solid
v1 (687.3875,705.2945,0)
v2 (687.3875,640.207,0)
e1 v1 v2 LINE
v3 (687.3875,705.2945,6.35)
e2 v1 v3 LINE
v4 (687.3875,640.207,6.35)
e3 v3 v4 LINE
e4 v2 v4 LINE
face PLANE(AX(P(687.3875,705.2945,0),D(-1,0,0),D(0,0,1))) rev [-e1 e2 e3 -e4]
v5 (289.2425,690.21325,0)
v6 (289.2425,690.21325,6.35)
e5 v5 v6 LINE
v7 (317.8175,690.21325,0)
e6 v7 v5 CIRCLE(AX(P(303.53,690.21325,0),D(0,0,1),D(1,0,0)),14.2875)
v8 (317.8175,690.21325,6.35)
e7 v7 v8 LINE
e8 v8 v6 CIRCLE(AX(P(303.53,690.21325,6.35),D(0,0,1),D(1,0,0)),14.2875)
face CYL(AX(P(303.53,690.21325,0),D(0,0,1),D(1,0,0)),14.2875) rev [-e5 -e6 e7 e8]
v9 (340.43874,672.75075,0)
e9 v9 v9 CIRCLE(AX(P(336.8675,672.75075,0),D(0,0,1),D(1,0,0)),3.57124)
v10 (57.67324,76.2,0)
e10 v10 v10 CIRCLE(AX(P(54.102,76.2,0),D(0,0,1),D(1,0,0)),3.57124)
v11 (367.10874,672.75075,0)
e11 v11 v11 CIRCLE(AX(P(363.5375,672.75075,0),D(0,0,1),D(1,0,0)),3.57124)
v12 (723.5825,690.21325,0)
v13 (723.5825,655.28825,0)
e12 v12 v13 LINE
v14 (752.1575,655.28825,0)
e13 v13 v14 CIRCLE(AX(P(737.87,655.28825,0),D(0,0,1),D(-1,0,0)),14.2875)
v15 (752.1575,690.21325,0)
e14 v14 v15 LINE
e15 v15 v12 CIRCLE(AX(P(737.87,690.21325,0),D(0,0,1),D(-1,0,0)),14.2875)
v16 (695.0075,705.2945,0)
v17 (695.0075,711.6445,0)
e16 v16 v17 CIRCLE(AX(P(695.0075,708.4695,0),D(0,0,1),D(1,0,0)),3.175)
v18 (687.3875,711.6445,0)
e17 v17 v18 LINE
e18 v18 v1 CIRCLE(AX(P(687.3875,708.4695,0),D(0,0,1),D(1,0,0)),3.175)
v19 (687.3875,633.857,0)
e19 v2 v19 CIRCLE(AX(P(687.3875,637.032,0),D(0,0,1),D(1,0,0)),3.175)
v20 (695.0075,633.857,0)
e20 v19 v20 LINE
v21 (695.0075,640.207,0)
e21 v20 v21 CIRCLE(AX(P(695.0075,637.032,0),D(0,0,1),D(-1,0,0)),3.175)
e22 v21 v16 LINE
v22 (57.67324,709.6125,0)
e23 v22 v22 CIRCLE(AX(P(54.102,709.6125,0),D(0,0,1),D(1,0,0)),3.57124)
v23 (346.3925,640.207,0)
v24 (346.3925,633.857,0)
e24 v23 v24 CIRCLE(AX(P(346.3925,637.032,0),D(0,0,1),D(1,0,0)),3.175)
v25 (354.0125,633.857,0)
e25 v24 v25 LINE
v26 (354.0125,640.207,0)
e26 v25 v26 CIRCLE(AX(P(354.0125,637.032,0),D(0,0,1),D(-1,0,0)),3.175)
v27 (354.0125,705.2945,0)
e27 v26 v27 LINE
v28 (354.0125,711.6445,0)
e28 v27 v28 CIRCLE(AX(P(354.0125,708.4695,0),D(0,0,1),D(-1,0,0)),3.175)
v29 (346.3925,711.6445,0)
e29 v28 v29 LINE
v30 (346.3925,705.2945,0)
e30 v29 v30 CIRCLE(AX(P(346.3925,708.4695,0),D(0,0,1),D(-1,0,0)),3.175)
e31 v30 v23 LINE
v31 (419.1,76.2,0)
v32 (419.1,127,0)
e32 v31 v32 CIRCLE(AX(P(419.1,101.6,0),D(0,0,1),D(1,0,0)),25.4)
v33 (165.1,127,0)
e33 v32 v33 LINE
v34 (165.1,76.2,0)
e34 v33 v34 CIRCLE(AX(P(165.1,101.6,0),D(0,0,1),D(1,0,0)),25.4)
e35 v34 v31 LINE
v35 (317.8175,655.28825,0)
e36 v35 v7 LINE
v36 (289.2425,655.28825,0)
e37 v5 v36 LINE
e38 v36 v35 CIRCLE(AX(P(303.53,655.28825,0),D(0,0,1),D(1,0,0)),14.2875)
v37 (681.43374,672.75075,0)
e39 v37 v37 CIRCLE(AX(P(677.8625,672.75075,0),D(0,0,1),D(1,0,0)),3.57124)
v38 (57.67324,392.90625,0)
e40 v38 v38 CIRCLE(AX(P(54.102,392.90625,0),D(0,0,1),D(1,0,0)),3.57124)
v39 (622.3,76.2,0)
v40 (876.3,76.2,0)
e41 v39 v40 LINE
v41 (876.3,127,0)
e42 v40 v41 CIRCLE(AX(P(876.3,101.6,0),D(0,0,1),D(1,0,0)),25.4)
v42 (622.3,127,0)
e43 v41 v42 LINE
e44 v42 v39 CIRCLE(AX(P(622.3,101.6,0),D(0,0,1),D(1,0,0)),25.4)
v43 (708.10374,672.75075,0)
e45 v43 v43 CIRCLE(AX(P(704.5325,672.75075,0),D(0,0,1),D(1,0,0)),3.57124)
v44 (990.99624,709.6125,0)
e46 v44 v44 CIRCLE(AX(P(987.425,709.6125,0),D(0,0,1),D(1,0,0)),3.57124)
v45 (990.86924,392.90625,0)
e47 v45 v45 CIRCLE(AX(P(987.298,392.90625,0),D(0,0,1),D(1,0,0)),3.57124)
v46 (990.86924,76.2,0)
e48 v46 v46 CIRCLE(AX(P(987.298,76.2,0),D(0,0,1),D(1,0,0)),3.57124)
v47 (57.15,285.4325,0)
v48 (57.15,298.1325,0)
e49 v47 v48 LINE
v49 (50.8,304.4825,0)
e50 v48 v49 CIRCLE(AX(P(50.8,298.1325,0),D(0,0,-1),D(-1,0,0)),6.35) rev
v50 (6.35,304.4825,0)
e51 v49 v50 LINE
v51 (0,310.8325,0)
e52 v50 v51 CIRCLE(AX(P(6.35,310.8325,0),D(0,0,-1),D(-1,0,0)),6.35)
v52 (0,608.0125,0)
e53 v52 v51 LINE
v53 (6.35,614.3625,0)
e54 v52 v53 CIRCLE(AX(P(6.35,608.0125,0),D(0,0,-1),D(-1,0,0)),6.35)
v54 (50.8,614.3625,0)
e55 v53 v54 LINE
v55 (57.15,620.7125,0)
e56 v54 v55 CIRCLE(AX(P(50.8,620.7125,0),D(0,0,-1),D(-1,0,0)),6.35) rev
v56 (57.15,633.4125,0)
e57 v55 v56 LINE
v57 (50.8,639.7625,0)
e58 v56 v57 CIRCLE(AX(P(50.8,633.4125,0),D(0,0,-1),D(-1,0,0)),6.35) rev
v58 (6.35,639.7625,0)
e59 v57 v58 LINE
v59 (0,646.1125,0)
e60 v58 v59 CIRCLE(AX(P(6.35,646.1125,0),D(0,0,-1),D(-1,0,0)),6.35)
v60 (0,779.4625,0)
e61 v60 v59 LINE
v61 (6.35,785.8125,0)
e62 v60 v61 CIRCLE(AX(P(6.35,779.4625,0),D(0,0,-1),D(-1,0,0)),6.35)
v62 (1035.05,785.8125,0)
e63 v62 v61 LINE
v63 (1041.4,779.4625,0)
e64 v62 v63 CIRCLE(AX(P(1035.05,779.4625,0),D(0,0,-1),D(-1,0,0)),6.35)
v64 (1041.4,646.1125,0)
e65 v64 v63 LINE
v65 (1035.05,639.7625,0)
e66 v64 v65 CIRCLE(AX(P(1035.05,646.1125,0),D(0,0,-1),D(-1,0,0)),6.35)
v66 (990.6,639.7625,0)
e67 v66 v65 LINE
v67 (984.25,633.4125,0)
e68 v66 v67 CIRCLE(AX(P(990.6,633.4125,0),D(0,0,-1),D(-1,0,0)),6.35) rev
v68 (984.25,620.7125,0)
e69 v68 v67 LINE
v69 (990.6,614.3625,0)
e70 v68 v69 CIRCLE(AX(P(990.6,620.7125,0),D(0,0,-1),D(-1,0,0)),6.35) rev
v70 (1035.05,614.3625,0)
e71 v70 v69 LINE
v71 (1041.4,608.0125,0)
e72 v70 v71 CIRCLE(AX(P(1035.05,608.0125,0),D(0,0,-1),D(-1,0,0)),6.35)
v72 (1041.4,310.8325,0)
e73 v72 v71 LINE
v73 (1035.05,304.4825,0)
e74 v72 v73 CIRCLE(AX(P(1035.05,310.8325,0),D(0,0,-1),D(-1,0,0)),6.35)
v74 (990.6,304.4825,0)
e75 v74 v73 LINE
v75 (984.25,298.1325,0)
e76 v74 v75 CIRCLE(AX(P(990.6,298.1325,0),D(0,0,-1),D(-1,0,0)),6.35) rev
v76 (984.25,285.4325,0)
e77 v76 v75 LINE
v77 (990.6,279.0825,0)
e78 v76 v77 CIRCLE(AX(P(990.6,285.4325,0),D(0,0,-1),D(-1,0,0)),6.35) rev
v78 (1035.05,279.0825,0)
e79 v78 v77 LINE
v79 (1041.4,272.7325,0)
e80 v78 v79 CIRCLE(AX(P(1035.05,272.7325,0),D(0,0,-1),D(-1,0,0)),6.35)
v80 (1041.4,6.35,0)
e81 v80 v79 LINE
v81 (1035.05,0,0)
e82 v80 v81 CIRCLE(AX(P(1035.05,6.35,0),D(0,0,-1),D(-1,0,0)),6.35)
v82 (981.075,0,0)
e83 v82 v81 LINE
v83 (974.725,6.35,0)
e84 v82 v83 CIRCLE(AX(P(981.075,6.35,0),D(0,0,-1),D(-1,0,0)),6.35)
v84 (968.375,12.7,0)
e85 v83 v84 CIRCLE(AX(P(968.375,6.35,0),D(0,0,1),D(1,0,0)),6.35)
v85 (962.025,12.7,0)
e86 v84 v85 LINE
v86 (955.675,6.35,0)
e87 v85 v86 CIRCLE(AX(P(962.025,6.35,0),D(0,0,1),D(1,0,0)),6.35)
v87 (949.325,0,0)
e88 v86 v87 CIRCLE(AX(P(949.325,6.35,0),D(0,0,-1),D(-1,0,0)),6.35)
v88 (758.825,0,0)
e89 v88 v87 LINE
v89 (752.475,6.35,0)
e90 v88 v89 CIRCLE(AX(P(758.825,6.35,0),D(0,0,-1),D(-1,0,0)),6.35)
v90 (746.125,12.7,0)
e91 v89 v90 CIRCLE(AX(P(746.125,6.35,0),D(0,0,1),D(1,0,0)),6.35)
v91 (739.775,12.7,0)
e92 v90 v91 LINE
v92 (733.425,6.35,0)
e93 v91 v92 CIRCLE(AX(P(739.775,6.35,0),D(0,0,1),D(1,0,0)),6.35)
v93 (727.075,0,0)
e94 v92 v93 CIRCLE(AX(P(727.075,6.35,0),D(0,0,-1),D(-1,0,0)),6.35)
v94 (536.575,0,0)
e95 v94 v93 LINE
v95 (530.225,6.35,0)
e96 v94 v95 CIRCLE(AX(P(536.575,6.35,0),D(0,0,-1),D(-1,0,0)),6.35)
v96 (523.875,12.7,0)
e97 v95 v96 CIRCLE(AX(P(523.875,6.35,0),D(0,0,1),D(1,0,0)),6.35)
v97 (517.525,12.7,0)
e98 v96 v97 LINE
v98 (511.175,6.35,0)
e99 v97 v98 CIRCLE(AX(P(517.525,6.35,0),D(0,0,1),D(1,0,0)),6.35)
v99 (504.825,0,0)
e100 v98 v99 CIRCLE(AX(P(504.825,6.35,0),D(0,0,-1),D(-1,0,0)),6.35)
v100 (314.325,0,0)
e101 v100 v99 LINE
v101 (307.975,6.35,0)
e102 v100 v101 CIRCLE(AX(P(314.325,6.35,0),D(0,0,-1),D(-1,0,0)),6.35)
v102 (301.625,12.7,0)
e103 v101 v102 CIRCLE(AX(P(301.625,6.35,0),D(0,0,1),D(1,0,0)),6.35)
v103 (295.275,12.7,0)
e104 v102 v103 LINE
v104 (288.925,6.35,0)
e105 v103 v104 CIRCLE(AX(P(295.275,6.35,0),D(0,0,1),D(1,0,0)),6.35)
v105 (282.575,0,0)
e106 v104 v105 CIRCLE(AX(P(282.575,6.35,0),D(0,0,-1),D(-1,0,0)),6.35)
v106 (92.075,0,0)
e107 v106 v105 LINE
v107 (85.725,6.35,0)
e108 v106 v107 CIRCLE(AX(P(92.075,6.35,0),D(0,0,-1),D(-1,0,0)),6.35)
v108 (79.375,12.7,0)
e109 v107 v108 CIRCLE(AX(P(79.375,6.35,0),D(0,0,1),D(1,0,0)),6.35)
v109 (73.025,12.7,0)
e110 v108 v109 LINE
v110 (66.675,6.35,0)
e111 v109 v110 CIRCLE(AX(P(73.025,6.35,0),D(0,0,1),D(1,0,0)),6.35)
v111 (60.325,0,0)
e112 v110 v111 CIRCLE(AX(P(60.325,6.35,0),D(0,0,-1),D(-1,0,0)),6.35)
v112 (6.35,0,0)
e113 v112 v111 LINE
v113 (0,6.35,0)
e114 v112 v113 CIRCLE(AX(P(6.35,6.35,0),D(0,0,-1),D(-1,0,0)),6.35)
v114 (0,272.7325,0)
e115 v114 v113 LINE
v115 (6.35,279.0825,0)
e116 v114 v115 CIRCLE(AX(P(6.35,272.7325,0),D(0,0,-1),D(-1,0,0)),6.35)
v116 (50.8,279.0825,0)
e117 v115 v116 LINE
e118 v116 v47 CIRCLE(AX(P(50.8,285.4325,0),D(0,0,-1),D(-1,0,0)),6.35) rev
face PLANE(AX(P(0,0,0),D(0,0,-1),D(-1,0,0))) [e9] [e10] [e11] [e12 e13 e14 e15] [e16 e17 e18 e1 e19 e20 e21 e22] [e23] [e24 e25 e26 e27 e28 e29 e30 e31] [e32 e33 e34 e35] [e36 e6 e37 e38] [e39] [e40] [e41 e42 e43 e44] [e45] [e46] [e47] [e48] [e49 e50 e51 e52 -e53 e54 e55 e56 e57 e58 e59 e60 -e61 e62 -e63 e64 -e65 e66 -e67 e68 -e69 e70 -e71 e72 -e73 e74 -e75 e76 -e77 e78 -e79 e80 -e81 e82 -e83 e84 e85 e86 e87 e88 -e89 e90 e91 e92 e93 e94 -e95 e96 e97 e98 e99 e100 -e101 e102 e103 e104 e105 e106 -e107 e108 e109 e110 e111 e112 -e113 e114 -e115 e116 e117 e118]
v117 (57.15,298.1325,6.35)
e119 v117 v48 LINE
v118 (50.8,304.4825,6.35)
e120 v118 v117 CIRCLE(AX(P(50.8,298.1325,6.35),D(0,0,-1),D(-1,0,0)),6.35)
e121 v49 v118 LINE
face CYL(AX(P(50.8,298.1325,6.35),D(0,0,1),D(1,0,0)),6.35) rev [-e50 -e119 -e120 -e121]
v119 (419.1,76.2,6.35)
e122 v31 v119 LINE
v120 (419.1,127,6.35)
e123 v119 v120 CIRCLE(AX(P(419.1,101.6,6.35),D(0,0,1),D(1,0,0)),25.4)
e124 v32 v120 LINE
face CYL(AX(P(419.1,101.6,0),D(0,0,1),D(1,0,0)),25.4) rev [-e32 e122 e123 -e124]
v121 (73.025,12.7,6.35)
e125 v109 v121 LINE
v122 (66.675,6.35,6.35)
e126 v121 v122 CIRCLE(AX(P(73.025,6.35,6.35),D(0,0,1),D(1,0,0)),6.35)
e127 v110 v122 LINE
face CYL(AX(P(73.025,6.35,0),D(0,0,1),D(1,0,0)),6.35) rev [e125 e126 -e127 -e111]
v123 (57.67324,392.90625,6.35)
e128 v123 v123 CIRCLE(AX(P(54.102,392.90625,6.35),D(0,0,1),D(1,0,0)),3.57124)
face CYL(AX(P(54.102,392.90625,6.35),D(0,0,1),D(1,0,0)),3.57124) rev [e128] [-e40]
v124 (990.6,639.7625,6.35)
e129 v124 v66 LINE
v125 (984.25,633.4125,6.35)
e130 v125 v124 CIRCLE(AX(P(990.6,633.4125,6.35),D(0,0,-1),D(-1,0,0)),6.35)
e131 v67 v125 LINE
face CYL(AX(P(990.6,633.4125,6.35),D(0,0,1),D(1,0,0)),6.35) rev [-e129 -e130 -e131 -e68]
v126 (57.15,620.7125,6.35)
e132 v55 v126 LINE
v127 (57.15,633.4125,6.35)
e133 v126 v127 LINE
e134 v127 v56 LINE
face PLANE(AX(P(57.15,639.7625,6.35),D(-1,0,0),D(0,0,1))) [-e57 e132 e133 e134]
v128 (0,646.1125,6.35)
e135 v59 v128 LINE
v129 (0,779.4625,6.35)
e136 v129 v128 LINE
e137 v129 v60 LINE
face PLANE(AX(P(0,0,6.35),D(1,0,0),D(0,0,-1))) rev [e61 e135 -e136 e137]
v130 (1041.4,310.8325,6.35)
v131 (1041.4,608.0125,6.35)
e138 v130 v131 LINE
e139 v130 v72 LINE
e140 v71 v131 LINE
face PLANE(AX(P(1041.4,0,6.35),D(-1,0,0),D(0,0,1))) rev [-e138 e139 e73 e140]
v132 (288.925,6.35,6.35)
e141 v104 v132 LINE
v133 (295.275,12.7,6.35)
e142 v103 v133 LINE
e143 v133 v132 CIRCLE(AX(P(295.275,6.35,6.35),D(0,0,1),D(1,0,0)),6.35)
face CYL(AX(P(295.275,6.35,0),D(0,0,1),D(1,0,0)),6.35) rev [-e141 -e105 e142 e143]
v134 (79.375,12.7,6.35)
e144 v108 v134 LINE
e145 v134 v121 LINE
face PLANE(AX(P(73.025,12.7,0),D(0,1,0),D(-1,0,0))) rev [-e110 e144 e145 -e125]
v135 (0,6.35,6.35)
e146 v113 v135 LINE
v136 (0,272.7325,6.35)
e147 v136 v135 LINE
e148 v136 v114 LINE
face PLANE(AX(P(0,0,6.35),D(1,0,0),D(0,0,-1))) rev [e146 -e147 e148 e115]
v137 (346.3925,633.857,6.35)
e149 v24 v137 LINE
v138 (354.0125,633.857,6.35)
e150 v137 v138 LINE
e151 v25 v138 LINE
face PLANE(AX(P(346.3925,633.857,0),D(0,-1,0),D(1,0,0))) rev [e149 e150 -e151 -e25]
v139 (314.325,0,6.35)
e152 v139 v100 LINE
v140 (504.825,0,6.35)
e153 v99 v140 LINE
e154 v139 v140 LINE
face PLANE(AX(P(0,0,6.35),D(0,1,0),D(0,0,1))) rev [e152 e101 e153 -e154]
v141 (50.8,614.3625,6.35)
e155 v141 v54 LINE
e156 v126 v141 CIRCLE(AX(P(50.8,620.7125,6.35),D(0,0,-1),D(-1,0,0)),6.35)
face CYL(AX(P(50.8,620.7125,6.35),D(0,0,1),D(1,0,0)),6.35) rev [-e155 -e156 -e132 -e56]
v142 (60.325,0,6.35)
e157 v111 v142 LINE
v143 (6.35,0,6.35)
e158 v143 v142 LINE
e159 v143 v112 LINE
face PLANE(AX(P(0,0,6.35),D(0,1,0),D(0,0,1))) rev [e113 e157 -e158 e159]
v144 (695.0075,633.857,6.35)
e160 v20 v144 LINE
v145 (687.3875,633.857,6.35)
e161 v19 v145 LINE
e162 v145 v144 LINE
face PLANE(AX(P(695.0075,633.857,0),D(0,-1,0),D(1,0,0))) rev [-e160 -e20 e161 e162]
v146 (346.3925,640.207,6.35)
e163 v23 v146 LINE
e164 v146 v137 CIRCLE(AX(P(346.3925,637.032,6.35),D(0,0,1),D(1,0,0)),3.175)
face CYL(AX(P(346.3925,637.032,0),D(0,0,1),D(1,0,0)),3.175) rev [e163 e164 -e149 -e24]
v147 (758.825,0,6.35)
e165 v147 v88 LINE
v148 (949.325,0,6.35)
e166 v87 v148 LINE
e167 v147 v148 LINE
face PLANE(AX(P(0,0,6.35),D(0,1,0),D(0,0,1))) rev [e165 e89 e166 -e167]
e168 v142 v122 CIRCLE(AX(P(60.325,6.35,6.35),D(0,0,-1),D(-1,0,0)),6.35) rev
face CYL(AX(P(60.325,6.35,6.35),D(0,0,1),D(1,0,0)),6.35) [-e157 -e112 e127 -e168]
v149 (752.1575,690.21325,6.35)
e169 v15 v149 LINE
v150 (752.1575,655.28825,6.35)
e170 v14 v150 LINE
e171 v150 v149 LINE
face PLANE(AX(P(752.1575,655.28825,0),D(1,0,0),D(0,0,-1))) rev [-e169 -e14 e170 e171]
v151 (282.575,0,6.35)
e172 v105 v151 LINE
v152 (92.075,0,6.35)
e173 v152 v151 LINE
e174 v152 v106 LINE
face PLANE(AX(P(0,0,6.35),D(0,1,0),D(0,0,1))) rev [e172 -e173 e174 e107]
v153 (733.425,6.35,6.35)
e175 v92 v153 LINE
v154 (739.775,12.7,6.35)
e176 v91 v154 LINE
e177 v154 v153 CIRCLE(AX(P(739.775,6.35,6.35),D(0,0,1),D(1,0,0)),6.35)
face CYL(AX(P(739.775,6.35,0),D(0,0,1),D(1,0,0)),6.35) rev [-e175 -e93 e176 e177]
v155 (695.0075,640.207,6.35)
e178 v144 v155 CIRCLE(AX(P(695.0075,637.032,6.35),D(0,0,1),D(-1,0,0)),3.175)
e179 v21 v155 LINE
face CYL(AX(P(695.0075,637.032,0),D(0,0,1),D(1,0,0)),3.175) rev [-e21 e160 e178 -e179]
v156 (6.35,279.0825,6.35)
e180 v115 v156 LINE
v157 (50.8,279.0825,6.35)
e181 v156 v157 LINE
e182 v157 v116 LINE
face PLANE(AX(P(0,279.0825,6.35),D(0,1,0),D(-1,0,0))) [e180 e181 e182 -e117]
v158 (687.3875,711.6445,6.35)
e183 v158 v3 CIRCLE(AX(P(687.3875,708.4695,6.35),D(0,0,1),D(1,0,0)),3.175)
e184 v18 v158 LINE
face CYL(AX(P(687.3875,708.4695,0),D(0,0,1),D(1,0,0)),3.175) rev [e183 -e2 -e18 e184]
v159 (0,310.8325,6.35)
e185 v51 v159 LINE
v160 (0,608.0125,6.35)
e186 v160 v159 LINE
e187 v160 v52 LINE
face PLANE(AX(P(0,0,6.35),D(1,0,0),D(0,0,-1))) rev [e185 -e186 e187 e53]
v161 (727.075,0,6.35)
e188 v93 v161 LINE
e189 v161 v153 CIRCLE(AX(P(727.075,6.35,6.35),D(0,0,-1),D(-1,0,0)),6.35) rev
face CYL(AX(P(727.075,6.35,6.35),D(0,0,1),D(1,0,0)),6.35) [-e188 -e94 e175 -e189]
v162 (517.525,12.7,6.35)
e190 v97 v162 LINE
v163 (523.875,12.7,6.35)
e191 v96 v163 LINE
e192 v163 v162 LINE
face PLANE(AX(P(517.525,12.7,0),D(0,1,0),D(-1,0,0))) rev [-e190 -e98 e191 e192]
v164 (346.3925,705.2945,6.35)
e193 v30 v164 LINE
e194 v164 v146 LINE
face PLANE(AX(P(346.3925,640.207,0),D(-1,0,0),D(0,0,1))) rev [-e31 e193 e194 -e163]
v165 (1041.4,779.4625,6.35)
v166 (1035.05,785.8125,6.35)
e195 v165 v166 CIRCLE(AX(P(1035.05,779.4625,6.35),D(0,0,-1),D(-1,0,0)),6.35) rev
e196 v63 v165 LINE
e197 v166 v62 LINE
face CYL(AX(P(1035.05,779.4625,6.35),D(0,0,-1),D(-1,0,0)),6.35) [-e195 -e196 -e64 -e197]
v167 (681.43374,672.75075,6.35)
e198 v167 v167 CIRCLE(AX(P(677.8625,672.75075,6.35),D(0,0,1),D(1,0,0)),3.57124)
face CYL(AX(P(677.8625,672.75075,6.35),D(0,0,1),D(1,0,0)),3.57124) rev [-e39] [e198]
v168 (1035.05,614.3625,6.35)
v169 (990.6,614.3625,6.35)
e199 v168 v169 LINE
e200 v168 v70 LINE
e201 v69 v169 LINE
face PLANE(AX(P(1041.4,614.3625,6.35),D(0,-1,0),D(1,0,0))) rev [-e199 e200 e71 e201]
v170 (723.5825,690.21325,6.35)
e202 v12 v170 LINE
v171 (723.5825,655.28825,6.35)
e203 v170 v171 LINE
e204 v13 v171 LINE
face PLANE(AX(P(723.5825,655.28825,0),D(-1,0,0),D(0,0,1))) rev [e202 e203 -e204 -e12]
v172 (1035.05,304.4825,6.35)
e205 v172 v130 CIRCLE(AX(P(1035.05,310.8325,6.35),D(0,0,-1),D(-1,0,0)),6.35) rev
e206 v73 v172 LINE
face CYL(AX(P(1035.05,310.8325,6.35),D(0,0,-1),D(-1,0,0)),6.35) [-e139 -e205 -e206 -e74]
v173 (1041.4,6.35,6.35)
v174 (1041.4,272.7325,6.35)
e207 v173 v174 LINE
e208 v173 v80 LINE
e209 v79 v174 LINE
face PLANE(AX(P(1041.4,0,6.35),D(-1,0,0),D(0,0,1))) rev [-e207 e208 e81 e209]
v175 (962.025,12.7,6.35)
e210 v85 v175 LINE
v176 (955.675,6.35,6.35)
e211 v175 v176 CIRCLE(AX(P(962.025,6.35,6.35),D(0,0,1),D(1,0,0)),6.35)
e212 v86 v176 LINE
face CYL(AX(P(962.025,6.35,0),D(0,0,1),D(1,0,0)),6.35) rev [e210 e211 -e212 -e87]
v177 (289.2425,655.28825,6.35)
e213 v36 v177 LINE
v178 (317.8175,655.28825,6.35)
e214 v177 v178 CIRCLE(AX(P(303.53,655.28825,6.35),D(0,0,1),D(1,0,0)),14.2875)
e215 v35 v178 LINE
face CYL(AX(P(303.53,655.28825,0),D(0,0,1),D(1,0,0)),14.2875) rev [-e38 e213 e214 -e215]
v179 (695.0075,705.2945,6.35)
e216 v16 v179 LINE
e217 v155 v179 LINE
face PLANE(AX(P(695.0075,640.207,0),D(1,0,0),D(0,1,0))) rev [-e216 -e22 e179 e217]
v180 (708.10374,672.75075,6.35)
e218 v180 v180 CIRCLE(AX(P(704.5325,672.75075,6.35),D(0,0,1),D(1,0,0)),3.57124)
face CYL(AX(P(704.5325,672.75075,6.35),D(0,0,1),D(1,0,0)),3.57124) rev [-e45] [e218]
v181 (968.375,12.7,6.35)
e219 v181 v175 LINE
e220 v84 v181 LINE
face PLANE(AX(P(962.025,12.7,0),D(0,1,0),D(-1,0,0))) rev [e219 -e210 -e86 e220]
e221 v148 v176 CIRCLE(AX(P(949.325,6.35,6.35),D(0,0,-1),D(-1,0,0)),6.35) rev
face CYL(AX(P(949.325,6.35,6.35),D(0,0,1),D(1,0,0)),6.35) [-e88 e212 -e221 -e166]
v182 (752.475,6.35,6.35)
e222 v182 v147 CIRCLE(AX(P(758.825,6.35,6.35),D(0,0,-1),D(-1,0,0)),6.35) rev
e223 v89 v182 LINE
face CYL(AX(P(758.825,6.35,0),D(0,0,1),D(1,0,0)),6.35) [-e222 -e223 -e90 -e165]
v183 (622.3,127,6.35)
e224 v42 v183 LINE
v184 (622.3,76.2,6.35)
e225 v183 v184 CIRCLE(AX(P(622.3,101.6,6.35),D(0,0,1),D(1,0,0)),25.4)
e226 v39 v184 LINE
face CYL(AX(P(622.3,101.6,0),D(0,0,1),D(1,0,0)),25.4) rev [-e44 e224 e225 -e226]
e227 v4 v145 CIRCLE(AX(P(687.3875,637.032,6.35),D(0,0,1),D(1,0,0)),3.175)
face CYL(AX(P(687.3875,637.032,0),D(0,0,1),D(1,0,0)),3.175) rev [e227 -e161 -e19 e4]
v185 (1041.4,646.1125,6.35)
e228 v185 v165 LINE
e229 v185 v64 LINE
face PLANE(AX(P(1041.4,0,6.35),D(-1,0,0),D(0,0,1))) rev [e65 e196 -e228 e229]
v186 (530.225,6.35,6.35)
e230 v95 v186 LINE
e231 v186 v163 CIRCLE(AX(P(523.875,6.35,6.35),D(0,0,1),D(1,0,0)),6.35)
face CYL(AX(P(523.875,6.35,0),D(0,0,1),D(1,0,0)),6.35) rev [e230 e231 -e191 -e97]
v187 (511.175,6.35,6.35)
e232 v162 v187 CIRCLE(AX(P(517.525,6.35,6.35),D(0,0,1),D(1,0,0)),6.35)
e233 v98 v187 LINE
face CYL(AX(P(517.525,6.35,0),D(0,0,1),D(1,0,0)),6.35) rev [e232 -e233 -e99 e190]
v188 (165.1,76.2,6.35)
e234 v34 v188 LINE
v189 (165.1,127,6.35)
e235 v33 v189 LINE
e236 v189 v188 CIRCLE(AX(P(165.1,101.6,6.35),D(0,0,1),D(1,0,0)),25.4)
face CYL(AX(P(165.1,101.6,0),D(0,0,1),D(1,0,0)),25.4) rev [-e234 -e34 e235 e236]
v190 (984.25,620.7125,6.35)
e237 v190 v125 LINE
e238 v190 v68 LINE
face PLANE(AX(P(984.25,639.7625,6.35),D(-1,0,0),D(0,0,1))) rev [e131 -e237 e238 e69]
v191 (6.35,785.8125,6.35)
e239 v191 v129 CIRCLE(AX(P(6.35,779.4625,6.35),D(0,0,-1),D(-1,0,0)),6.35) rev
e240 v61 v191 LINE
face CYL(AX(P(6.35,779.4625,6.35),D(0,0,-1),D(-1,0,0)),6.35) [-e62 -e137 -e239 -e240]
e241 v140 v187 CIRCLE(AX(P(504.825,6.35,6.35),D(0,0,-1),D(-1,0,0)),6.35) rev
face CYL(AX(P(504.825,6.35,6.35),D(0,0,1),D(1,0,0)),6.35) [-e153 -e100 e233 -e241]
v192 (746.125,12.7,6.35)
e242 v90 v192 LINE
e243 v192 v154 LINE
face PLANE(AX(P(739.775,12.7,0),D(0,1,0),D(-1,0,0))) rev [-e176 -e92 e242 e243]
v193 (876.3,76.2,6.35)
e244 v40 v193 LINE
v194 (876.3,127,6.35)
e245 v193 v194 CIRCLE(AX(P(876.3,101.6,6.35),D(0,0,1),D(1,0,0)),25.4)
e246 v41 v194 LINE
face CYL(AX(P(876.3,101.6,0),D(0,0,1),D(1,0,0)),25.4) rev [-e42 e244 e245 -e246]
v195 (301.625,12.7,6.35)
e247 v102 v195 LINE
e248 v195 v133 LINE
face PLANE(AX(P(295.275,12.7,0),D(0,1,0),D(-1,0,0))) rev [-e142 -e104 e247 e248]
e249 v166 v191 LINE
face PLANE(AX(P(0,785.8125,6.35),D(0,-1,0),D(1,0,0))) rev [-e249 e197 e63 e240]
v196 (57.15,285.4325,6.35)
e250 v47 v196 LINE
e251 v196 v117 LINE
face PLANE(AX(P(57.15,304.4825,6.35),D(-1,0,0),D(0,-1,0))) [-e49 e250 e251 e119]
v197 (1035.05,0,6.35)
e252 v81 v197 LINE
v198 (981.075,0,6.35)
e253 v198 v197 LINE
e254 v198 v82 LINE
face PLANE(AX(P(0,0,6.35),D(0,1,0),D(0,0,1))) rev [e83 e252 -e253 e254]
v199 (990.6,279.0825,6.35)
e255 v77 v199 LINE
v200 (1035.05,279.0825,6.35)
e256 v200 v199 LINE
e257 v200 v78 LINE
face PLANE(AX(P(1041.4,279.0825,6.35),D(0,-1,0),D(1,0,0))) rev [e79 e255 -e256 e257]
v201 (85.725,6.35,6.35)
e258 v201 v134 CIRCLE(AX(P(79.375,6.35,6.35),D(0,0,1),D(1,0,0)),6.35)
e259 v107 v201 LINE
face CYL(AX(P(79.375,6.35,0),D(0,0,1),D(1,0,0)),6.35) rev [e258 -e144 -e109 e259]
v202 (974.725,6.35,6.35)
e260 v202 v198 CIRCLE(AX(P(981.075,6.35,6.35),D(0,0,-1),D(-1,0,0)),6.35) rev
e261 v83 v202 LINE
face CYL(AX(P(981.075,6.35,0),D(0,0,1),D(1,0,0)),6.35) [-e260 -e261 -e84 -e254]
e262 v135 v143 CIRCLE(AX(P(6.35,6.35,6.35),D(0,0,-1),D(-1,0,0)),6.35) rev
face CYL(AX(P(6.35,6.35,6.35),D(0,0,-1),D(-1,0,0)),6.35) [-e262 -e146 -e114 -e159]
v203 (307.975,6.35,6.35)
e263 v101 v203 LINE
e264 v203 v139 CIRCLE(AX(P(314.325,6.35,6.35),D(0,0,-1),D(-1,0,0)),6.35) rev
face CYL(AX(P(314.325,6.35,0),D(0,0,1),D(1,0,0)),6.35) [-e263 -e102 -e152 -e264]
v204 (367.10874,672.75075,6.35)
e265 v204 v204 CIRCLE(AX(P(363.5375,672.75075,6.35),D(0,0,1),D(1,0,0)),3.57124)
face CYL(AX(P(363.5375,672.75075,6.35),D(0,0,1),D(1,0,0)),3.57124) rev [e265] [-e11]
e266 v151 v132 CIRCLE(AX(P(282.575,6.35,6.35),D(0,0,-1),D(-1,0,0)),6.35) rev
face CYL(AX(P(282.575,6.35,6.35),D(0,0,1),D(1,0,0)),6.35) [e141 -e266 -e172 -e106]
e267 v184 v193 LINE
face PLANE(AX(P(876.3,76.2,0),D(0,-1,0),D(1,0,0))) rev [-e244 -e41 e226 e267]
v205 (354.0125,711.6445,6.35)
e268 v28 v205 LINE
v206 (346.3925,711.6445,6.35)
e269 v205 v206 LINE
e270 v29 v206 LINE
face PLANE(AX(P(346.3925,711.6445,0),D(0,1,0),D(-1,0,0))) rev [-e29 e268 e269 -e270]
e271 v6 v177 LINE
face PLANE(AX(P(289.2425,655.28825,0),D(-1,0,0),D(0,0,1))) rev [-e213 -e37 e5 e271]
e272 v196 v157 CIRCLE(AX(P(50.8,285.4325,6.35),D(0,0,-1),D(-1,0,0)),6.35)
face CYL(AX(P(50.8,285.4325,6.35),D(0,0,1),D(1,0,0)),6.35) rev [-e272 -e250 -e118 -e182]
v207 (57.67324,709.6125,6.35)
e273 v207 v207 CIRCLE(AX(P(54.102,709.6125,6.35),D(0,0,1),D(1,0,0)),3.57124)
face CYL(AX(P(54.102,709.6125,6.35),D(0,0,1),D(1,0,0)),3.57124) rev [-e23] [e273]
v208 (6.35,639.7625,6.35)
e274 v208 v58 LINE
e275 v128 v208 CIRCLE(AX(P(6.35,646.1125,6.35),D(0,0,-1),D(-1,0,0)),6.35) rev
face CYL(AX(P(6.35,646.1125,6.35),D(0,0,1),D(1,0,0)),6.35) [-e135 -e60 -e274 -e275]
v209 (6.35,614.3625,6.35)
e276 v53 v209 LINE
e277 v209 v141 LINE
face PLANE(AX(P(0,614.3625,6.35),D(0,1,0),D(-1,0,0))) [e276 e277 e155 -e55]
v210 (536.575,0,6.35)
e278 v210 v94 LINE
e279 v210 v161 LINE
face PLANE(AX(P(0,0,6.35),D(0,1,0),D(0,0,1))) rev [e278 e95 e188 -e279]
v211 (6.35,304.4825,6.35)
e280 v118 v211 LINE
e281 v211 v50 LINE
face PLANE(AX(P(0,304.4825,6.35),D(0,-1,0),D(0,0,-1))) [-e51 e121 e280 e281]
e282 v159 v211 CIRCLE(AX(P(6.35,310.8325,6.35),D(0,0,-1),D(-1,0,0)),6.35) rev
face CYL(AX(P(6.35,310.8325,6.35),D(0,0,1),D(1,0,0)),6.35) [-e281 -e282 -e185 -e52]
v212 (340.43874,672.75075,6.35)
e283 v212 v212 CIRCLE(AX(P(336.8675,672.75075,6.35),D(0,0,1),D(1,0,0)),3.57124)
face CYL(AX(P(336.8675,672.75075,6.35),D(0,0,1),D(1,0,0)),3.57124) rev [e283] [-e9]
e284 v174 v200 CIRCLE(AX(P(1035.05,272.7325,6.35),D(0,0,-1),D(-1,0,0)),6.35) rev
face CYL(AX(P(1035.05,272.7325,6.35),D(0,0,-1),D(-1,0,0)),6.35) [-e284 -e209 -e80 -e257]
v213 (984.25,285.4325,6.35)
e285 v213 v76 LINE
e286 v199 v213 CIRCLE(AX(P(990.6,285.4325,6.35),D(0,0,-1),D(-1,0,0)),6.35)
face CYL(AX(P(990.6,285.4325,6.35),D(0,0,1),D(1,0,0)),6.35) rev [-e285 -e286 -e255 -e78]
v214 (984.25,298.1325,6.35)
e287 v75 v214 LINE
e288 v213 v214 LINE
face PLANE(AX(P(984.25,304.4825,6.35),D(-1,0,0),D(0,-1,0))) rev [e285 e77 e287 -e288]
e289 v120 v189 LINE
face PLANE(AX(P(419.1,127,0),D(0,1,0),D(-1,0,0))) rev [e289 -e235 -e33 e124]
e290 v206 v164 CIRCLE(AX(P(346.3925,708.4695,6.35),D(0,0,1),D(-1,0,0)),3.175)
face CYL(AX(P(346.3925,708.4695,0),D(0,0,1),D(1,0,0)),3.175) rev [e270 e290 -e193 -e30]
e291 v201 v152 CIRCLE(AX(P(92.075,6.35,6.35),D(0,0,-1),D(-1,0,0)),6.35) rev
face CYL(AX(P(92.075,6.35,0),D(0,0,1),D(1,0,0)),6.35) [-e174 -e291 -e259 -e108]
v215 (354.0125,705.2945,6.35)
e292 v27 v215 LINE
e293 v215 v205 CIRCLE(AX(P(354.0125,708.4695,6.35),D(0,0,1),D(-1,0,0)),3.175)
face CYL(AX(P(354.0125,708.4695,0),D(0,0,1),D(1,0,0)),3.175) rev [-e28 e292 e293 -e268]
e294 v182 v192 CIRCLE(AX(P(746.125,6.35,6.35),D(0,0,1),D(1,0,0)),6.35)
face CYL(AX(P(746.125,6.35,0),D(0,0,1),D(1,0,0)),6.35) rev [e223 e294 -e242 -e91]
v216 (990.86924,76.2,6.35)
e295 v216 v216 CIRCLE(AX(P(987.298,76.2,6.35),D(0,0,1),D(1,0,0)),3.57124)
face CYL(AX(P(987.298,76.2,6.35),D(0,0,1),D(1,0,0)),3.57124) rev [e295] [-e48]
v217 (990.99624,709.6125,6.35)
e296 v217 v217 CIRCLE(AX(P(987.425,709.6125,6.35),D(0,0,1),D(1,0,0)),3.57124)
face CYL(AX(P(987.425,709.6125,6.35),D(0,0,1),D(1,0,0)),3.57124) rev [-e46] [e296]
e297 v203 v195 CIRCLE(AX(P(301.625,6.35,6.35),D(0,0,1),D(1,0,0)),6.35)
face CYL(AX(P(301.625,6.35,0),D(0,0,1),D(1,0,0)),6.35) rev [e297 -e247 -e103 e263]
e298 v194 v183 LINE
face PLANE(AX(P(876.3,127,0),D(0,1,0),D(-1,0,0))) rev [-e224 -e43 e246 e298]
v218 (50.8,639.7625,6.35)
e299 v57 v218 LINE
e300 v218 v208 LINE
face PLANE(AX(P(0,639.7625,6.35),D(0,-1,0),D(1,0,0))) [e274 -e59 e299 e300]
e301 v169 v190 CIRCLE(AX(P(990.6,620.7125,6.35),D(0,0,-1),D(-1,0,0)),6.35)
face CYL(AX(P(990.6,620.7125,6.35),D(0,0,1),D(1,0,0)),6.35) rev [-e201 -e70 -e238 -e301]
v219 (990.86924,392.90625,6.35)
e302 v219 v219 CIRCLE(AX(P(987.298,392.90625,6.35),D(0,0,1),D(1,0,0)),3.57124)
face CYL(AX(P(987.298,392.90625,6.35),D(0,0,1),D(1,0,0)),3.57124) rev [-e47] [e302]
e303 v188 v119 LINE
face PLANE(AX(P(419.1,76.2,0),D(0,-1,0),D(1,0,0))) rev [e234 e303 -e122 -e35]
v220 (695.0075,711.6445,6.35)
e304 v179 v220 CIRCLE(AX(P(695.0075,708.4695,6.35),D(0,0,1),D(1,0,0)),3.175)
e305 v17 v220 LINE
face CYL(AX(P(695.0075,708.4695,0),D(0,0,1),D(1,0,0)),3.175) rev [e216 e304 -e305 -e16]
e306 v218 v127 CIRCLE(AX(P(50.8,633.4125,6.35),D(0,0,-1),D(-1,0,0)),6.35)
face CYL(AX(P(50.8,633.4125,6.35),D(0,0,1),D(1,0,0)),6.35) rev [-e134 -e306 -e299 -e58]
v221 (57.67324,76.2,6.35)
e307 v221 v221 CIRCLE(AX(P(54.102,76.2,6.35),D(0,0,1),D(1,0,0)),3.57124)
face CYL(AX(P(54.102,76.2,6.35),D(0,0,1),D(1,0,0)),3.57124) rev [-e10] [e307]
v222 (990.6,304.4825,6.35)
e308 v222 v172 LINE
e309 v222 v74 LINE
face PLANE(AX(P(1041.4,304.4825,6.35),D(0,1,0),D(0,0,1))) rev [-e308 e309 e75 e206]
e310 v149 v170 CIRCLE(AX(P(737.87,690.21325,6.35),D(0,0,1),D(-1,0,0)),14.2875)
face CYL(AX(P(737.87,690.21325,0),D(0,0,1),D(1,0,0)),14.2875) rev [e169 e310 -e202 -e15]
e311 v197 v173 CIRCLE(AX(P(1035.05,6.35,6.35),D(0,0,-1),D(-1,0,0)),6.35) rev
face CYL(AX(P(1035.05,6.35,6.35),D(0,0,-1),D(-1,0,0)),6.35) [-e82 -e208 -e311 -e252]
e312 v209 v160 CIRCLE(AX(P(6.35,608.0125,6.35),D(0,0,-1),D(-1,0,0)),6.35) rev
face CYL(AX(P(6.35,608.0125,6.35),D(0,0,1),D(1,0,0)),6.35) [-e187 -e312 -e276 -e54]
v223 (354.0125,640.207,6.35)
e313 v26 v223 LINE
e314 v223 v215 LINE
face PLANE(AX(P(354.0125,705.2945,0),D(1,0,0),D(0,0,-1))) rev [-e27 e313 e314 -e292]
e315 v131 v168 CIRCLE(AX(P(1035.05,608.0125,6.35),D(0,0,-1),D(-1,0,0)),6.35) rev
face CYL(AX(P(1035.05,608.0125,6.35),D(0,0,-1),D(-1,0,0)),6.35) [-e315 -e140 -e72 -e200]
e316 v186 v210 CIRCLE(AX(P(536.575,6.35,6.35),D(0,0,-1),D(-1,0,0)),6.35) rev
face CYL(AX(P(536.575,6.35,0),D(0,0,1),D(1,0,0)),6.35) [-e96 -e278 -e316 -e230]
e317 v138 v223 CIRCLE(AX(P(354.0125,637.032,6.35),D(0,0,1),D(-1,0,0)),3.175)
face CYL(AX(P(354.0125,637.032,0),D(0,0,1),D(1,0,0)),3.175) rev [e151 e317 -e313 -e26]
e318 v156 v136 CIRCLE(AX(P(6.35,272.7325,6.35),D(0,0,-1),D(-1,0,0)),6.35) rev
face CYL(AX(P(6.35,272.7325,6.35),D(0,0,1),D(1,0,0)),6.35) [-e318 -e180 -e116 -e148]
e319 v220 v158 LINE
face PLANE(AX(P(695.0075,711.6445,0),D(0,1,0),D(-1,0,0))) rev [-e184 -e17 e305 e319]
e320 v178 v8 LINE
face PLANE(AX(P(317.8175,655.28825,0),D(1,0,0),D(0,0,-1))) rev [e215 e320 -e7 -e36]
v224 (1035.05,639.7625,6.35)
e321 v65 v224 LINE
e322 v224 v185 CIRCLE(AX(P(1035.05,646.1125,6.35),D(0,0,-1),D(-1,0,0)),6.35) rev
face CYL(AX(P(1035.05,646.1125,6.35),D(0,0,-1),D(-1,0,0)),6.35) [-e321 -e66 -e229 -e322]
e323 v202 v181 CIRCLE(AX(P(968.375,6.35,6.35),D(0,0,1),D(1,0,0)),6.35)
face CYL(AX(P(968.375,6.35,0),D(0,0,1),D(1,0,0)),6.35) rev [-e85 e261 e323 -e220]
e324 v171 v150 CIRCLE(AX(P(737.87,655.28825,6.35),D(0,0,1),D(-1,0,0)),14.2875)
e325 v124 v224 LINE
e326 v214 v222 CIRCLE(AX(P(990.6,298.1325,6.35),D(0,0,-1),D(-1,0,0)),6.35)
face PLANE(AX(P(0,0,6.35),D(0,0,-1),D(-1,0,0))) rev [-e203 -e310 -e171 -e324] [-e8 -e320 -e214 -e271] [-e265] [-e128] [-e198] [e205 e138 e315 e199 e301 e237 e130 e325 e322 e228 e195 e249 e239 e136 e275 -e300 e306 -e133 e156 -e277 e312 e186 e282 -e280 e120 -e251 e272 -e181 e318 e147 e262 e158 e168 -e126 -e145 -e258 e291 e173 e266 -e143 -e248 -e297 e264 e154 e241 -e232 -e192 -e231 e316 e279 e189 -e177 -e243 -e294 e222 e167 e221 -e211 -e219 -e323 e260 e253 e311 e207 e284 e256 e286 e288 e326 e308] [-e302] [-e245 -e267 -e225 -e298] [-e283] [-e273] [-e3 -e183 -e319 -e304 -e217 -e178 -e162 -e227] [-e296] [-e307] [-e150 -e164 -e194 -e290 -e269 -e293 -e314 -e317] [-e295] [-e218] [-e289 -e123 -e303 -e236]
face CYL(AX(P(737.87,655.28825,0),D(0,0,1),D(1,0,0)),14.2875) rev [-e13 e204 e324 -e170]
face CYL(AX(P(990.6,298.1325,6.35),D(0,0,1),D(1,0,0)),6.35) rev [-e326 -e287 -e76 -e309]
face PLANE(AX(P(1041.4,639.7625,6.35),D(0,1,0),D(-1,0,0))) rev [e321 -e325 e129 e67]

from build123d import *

# Parameters (mm, degrees)
SKETCH1_W               = 1041.4
SKETCH1_H               = 785.8125
BOSS_EXTRUDE1_DEPTH     = 6.35
CUT_EXTRUDE5_DEPTH      = 1305.62851711
F_1_4_CLEARANCE_HOLE1_D = 7.14248
CUT_EXTRUDE6_DEPTH      = 1305.62851711
SKETCH13_W              = 57.15
SKETCH13_H              = 25.4
CUT_EXTRUDE7_DEPTH      = 1305.62851711
FILLET1_R               = 6.35
FILLET1_OF_MIRROR1_R    = 6.35
CUT_EXTRUDE8_DEPTH      = 1305.62851711
LPATTERN1_COUNT         = 5
LPATTERN1_PITCH         = 222.25
CUT_EXTRUDE9_DEPTH      = 1305.62851711
LPATTERN2_COUNT         = 2
LPATTERN2_PITCH         = 457.2
FILLET2_R               = 6.35


with BuildPart() as part:
    # Sketch1 → Boss-Extrude1 (new body)
    with BuildSketch(Plane.XY):
        with Locations((520.7, 392.90625)):
            Rectangle(SKETCH1_W, SKETCH1_H)
    extrude(amount=BOSS_EXTRUDE1_DEPTH)

    # Sketch11 → Cut-Extrude5 (cut, through all)
    with BuildSketch(Plane.XY.offset(6.35)):
        with BuildLine():
            Line((346.3925, 640.207), (346.3925, 705.2945))
            ThreePointArc((346.3925, 705.2945), (343.2175, 708.4695), (346.3925, 711.6445))
            Line((346.3925, 711.6445), (354.0125, 711.6445))
            ThreePointArc((354.0125, 711.6445), (357.1875, 708.4695), (354.0125, 705.2945))
            Line((354.0125, 705.2945), (354.0125, 640.207))
            ThreePointArc((354.0125, 640.207), (357.1875, 637.032), (354.0125, 633.857))
            Line((354.0125, 633.857), (346.3925, 633.857))
            ThreePointArc((346.3925, 633.857), (343.2175, 637.032), (346.3925, 640.207))
        make_face()
        with BuildLine():
            Line((695.0075, 633.857), (687.3875, 633.857))
            ThreePointArc((687.3875, 633.857), (684.2125, 637.032), (687.3875, 640.207))
            Line((687.3875, 640.207), (687.3875, 705.2945))
            ThreePointArc((687.3875, 705.2945), (684.2125, 708.4695), (687.3875, 711.6445))
            Line((687.3875, 711.6445), (695.0075, 711.6445))
            ThreePointArc((695.0075, 711.6445), (698.1825, 708.4695), (695.0075, 705.2945))
            Line((695.0075, 705.2945), (695.0075, 640.207))
            ThreePointArc((695.0075, 640.207), (698.1825, 637.032), (695.0075, 633.857))
        make_face()
    extrude(amount=-CUT_EXTRUDE5_DEPTH, mode=Mode.SUBTRACT)

    # 1/4 Clearance Hole1 (through all)
    with Locations(Plane.XY.offset(6.35)):
        with Locations((54.102, 709.6125), (54.102, 76.2), (54.102, 392.90625), (987.298, 76.2), (987.298, 392.90625), (987.425, 709.6125), (336.8675, 672.75075), (363.5375, 672.75075), (677.8625, 672.75075), (704.5325, 672.75075)):
            Hole(F_1_4_CLEARANCE_HOLE1_D / 2)

    # Sketch12 → Cut-Extrude6 (cut, through all)
    with BuildSketch(Plane.XY.offset(6.35)):
        with BuildLine():
            Line((289.2425, 655.28825), (289.2425, 690.21325))
            ThreePointArc((289.2425, 690.21325), (303.53, 704.50075), (317.8175, 690.21325))
            Line((317.8175, 690.21325), (317.8175, 655.28825))
            ThreePointArc((317.8175, 655.28825), (303.53, 641.00075), (289.2425, 655.28825))
        make_face()
        with BuildLine():
            Line((752.1575, 655.28825), (752.1575, 690.21325))
            ThreePointArc((752.1575, 690.21325), (737.87, 704.50075), (723.5825, 690.21325))
            Line((723.5825, 690.21325), (723.5825, 655.28825))
            ThreePointArc((723.5825, 655.28825), (737.87, 641.00075), (752.1575, 655.28825))
        make_face()
    extrude(amount=-CUT_EXTRUDE6_DEPTH, mode=Mode.SUBTRACT)

    # Sketch13 → Cut-Extrude7 (cut, through all)
    with BuildSketch(Plane(origin=(0, 0, 0), x_dir=(-1, 0, 0), z_dir=(0, 0, -1))):
        with Locations((-1012.825, 627.0625)):
            Rectangle(SKETCH13_W, SKETCH13_H)
        with Locations((-1012.825, 291.7825)):
            Rectangle(SKETCH13_W, SKETCH13_H)
    cut_extrude7 = extrude(amount=-CUT_EXTRUDE7_DEPTH, mode=Mode.SUBTRACT)

    # Fillet1
    fillet1_edges = [part.edges().sort_by_distance(p)[0] for p in [
        (984.25, 639.7625, 3.175),
        (984.25, 614.3625, 3.175),
        (984.25, 304.4825, 3.175),
        (984.25, 279.0825, 3.175),
    ]]
    fillet(fillet1_edges, radius=FILLET1_R)

    # Mirror1: Cut-Extrude7 across plane
    add(cut_extrude7.mirror(Plane(origin=(520.7, 0, 0), x_dir=(0, 0, 1), z_dir=(1, 0, 0))), mode=Mode.SUBTRACT)

    # Fillet1 of Mirror1
    fillet1_of_mirror1_edges = [part.edges().sort_by_distance(p)[0] for p in [
        (57.15, 639.7625, 3.175),
        (57.15, 614.3625, 3.175),
        (57.15, 304.4825, 3.175),
        (57.15, 279.0825, 3.175),
    ]]
    fillet(fillet1_of_mirror1_edges, radius=FILLET1_OF_MIRROR1_R)

    # Sketch16 → Cut-Extrude8 (cut, through all)
    with BuildSketch(Plane.XY.offset(6.35)):
        with BuildLine():
            Line((66.675, 0), (85.725, 0))
            Line((85.725, 0), (85.725, 6.35))
            ThreePointArc((85.725, 6.35), (83.865128061, 10.840128061), (79.375, 12.7))
            Line((79.375, 12.7), (73.025, 12.7))
            ThreePointArc((73.025, 12.7), (68.534871939, 10.840128061), (66.675, 6.35))
            Line((66.675, 6.35), (66.675, 0))
        make_face()
    cut_extrude8 = extrude(amount=-CUT_EXTRUDE8_DEPTH, mode=Mode.SUBTRACT)

    # LPattern1: Cut-Extrude8 ×5
    with Locations(*[(i * LPATTERN1_PITCH, 0, 0) for i in range(1, LPATTERN1_COUNT)]):
        add(cut_extrude8, mode=Mode.SUBTRACT)

    # Sketch17 → Cut-Extrude9 (cut, through all)
    with BuildSketch(Plane.XY.offset(6.35)):
        with BuildLine():
            Line((419.1, 76.2), (165.1, 76.2))
            ThreePointArc((165.1, 76.2), (139.7, 101.6), (165.1, 127))
            Line((165.1, 127), (419.1, 127))
            ThreePointArc((419.1, 127), (444.5, 101.6), (419.1, 76.2))
        make_face()
    cut_extrude9 = extrude(amount=-CUT_EXTRUDE9_DEPTH, mode=Mode.SUBTRACT)

    # LPattern2: Cut-Extrude9 ×2
    with Locations(*[(i * LPATTERN2_PITCH, 0, 0) for i in range(1, LPATTERN2_COUNT)]):
        add(cut_extrude9, mode=Mode.SUBTRACT)

    # Fillet2
    fillet2_edges = [part.edges().sort_by_distance(p)[0] for p in [
        (0, 785.8125, 3.175),
        (0, 639.7625, 3.175),
        (0, 614.3625, 3.175),
        (0, 304.4825, 3.175),
        (0, 279.0825, 3.175),
        (0, 0, 3.175),
        (66.675, 0, 3.175),
        (85.725, 0, 3.175),
        (288.925, 0, 3.175),
        (307.975, 0, 3.175),
        (511.175, 0, 3.175),
        (530.225, 0, 3.175),
        (733.425, 0, 3.175),
        (752.475, 0, 3.175),
        (955.675, 0, 3.175),
        (974.725, 0, 3.175),
        (1041.4, 0, 3.175),
        (1041.4, 279.0825, 3.175),
        (1041.4, 304.4825, 3.175),
        (1041.4, 614.3625, 3.175),
        (1041.4, 639.7625, 3.175),
        (1041.4, 785.8125, 3.175),
    ]]
    fillet(fillet2_edges, radius=FILLET2_R - 0.0001)  # a hair under: the kernel refuses the full size


solid = part.part
